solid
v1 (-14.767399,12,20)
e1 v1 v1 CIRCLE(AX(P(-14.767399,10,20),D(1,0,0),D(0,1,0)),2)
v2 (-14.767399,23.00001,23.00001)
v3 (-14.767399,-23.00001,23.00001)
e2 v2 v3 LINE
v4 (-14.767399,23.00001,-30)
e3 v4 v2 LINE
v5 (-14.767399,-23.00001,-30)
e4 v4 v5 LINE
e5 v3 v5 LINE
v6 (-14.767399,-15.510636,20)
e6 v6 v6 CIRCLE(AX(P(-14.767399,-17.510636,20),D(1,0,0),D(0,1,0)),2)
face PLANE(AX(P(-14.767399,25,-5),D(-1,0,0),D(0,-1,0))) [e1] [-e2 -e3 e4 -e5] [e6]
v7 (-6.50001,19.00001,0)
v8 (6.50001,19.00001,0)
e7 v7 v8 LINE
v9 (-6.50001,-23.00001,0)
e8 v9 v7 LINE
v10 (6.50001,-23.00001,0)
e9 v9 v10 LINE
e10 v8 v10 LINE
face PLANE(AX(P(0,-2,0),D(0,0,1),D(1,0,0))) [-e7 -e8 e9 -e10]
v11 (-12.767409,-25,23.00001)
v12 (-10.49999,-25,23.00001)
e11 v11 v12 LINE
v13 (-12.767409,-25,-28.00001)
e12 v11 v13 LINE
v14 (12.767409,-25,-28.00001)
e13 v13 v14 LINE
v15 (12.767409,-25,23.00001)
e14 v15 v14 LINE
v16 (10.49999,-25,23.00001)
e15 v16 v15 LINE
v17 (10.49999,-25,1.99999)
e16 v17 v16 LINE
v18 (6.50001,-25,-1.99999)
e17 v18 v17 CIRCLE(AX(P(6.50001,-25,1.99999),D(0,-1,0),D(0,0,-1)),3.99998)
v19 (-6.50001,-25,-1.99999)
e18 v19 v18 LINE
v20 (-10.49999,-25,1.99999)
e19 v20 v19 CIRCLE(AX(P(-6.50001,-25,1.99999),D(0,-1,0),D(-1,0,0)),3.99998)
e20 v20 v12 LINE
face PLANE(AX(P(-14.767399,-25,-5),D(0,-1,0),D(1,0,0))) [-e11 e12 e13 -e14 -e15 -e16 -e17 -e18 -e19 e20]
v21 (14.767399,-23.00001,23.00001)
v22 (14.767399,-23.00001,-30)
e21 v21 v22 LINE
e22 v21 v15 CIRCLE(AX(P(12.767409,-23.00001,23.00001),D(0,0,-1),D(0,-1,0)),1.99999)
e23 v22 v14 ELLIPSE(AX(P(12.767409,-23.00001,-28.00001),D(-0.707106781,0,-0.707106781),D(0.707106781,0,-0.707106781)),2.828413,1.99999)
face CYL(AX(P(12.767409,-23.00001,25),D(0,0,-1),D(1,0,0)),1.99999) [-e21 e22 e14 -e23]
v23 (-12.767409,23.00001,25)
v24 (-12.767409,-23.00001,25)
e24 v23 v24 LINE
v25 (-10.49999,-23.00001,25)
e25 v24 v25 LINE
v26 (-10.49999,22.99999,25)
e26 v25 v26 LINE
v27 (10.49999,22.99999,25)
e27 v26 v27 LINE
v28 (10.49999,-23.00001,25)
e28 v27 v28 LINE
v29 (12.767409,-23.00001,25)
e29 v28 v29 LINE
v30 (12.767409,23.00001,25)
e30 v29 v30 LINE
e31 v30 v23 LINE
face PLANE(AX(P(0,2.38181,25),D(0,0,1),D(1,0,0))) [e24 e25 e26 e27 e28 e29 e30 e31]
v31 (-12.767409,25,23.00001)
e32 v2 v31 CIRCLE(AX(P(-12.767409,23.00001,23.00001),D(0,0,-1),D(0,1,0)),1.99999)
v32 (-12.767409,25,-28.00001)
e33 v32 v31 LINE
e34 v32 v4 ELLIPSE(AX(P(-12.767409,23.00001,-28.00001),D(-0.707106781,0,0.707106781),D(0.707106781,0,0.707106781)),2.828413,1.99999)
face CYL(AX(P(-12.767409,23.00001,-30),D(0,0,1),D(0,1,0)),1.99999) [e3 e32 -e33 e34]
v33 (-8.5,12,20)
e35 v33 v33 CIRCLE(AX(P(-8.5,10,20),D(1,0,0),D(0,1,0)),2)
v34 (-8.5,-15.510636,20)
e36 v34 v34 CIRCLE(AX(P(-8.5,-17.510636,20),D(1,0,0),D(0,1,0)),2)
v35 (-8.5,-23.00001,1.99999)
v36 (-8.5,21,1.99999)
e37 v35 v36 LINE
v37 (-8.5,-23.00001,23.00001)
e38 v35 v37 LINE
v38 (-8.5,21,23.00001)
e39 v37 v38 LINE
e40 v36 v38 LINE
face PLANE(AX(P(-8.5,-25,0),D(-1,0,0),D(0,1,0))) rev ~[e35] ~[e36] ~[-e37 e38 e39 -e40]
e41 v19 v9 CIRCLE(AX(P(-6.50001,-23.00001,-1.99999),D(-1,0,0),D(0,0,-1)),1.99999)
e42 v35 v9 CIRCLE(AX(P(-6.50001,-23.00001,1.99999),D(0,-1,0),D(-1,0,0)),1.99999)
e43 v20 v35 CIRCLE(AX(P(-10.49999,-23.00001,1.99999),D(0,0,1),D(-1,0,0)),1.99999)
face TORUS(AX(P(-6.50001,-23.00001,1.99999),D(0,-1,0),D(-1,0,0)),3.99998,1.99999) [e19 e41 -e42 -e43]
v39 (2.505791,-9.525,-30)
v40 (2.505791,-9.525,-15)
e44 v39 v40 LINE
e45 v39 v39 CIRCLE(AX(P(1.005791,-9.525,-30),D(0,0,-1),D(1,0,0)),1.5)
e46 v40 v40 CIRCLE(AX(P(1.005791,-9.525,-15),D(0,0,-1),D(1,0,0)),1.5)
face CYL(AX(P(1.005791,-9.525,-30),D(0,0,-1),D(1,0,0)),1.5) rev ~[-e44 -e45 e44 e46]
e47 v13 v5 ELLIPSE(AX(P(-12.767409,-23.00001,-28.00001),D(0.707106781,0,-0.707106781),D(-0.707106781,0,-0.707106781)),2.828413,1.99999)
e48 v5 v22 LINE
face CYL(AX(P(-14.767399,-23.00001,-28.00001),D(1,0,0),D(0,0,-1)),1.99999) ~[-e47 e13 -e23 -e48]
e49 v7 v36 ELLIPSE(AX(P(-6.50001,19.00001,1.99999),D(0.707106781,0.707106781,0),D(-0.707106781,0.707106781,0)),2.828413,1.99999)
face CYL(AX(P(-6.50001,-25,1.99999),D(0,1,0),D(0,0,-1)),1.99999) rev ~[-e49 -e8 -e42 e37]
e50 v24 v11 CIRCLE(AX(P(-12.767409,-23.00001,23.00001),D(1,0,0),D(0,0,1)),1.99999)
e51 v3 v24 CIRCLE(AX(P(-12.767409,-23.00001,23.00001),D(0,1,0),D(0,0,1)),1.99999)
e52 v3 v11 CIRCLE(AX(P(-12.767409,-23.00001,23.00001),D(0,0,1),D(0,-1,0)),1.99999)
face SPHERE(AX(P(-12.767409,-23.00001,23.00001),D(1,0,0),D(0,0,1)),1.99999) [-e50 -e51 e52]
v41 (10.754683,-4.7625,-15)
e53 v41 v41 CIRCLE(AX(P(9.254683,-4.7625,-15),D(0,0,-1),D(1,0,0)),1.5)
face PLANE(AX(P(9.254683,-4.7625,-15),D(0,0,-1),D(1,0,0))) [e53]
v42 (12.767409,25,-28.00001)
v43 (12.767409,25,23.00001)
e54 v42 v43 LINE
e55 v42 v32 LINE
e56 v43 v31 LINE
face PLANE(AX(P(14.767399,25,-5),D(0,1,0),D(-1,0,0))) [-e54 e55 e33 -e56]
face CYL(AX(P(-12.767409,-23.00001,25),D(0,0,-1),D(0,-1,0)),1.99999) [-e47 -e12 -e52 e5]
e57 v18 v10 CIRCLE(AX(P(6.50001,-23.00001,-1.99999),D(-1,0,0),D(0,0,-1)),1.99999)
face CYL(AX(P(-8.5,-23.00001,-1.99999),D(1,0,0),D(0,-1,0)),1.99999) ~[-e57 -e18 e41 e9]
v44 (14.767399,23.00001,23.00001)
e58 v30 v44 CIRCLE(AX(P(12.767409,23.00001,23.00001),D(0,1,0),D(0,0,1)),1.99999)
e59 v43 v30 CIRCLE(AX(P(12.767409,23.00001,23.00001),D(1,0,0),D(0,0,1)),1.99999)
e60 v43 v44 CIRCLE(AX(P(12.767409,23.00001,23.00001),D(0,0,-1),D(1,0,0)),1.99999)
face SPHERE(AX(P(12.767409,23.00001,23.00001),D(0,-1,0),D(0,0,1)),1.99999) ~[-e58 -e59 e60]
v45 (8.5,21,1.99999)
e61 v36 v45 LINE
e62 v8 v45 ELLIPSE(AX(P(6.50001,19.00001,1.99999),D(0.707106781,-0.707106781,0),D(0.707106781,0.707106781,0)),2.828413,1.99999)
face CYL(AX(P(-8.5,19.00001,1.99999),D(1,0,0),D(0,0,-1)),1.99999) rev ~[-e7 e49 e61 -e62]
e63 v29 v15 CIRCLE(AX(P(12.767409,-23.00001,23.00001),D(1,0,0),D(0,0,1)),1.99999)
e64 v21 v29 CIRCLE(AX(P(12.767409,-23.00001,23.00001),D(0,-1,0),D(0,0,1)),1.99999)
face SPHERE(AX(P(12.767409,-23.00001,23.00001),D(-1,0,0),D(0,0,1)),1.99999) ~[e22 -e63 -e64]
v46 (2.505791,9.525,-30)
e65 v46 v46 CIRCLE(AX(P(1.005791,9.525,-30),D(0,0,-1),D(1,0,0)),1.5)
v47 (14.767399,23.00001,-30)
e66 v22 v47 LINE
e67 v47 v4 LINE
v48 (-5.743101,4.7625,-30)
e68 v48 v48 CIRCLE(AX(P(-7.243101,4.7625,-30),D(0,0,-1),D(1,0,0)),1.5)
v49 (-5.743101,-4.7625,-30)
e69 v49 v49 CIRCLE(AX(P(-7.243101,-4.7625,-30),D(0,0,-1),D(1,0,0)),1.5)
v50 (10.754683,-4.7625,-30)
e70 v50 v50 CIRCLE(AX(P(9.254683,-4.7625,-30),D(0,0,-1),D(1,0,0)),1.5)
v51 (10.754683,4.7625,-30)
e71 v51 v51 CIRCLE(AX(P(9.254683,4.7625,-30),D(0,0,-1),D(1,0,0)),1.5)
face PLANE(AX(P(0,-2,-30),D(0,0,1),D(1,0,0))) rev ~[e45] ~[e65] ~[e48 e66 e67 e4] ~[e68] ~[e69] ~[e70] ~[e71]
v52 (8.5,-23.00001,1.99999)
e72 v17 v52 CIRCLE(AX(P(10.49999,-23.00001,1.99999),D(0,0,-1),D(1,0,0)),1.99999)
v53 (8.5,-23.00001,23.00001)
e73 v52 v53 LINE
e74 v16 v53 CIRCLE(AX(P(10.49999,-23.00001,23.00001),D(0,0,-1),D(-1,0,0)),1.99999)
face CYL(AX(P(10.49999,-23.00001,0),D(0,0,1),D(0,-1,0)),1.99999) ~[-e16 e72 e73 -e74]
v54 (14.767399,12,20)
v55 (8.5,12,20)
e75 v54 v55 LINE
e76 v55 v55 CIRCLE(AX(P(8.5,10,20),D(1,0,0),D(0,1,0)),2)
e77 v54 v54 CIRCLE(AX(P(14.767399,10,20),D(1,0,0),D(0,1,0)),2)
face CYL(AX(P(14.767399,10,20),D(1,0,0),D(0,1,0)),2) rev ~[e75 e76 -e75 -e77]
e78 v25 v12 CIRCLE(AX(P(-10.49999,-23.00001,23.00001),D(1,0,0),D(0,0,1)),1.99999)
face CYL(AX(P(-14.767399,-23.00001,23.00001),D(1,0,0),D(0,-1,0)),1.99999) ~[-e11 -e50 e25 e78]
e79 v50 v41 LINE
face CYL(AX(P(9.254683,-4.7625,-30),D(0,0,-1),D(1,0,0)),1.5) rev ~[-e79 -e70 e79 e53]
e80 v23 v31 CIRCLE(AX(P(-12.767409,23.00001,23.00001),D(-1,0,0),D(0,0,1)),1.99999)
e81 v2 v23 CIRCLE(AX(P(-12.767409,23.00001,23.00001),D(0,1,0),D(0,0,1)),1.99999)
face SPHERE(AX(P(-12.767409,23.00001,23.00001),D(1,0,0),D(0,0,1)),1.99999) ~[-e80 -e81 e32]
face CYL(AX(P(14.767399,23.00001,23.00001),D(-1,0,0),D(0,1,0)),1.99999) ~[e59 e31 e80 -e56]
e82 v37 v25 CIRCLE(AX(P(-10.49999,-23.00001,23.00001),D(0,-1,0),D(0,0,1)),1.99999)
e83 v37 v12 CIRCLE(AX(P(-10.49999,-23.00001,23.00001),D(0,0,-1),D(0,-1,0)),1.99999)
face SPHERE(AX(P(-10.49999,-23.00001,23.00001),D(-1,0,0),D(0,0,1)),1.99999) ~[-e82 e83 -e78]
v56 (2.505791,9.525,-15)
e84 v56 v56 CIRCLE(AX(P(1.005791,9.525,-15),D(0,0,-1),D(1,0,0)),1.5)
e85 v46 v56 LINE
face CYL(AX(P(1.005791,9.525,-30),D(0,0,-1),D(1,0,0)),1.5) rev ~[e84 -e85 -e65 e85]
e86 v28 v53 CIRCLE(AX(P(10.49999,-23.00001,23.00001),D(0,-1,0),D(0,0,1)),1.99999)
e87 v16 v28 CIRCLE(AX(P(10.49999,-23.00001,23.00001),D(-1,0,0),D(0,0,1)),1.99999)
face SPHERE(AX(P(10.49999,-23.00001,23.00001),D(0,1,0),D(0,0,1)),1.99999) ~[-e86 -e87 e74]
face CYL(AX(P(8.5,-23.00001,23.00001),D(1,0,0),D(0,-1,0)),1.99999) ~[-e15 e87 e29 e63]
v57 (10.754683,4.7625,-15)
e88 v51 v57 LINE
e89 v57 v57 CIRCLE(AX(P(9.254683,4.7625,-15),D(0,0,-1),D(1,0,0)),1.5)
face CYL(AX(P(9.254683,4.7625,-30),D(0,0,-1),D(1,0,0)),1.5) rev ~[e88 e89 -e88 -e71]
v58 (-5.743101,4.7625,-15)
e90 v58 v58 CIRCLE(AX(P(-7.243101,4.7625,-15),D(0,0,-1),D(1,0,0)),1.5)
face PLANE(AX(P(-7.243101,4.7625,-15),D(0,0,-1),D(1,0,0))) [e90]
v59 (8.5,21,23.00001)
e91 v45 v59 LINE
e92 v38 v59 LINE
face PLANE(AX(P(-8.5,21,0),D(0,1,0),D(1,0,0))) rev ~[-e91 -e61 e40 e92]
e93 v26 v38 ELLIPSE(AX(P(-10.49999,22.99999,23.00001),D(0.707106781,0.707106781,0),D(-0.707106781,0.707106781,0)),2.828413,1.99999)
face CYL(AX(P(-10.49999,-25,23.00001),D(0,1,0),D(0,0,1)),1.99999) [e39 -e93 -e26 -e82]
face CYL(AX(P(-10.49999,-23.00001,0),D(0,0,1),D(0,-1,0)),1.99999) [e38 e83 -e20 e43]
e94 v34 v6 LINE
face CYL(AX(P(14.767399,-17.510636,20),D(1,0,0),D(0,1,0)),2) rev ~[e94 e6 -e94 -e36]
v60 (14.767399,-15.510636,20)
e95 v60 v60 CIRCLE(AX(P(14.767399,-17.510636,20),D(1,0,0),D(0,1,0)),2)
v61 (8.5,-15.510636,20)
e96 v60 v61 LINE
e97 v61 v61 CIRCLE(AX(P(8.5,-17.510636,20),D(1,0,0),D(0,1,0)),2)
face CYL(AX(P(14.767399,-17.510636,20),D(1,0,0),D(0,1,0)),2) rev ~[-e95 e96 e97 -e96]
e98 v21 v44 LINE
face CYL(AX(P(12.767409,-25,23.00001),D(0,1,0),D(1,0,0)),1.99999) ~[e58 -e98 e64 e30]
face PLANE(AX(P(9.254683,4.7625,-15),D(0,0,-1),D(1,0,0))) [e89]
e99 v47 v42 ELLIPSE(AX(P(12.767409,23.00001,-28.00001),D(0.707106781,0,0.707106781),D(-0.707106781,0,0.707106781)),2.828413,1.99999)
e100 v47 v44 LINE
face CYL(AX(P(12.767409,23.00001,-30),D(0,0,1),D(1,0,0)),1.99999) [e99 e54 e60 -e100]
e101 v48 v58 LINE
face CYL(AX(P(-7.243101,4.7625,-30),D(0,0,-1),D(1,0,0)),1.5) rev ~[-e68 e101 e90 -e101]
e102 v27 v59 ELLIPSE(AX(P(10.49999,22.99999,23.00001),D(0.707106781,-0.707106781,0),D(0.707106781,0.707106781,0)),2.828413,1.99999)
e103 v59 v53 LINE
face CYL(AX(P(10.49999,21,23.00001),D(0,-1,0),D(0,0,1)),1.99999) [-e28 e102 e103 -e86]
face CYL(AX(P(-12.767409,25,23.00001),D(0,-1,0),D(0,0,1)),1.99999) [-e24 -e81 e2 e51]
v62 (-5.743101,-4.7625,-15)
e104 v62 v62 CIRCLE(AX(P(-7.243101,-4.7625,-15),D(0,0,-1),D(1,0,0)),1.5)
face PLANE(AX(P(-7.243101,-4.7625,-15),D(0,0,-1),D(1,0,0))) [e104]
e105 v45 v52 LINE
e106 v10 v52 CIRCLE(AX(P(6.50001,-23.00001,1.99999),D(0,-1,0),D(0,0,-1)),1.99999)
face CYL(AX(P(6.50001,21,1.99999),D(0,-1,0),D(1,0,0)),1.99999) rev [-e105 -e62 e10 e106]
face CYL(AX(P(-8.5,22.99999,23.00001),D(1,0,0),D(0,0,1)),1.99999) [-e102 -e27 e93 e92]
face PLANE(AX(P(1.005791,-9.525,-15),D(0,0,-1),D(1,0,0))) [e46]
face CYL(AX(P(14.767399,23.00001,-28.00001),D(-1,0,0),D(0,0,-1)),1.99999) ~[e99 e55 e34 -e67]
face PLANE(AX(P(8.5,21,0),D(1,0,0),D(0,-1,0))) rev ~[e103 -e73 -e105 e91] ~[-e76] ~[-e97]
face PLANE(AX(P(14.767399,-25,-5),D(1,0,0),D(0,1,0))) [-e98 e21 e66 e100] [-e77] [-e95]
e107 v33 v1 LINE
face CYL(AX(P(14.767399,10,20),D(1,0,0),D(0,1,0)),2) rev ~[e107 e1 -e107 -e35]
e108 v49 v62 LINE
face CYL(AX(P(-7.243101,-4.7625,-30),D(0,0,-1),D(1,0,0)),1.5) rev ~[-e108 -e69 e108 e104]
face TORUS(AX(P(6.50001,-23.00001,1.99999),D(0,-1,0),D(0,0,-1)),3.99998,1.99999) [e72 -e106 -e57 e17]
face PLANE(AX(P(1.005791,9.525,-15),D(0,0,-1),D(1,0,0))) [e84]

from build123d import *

# Parameters (mm, degrees)
F1_DEPTH  = 25
F2_DEPTH  = 5
F3_DEPTH  = 25
F4_R      = 2
F5_DEPTH  = 29.5357977842
F6_R      = 2
F7_DEPTH  = 29.5357977842
F8_R      = 1.99999
F9_R      = 1.5
F10_DEPTH = 15


# Not quite as in the source:
# - a fillet or chamfer is up to 0.001 mm smaller than in the source, because OpenCascade refuses the exact size
# - a feature names something its author has since deleted; it is built from what else it names


with BuildPart() as f1:
    # F0 (on Top) → F1 (new body)
    with BuildSketch(Plane.XY):
        Polygon((-8.5, -23.510635891), (-8.5, 0), (-8.5, 21), (8.5, 21), (8.5, 0), (8.5, -23.510635891), (8.5, -25), (14.7673988921, -25), (14.7673988921, -20.1723555878), (14.7673988921, -13.510635891), (14.7673988921, 25), (-14.7673988921, 25), (-14.7673988921, -20.1723555878), (-14.7673988921, -25), (-8.5, -25), align=None)
    extrude(amount=F1_DEPTH)

    # F0 (on Top) → F2 (join)
    with BuildSketch(Plane.XY):
        Polygon((-8.5, 21), (-8.5, 0), (-8.5, -23.510635891), (-8.5, -25), (8.5, -25), (8.5, -23.510635891), (8.5, 0), (8.5, 21), align=None)
        Polygon((-8.5, -23.510635891), (-8.5, 0), (-8.5, 21), (8.5, 21), (8.5, 0), (8.5, -23.510635891), (8.5, -25), (14.7673988921, -25), (14.7673988921, -20.1723555878), (14.7673988921, -13.510635891), (14.7673988921, 25), (-14.7673988921, 25), (-14.7673988921, -20.1723555878), (-14.7673988921, -25), (-8.5, -25), align=None)
    extrude(amount=-F2_DEPTH)

    # F3 (add): a face of the model
    f3_faces = [f1.faces().sort_by_distance(p)[0] for p in [
        (0, 0, -5),
    ]]
    extrude(f3_faces, amount=F3_DEPTH)

    # F4 (on face) → F5 (cut, through all)
    with BuildSketch(Plane.YZ.offset(14.7673988921)):
        with Locations((10, 20)):
            Circle(F4_R)
    extrude(amount=-F5_DEPTH, mode=Mode.SUBTRACT)

    # F6 (on face) → F7 (cut, through all)
    with BuildSketch(Plane.YZ.offset(14.7673988921)):
        with Locations((-17.510635891, 20)):
            Circle(F6_R)
    extrude(amount=-F7_DEPTH, mode=Mode.SUBTRACT)

    # F8 (radius 2 in the source; OpenCascade refuses exactly that, so slightly less here)
    f8_edges = [f1.edges().sort_by_distance(p)[0] for p in [
        (-11.633699, -25, 25),
        (-8.5, -2, 25),
        (0, 21, 25),
        (8.5, -2, 25),
        (11.633699, -25, 25),
        (14.767399, 0, 25),
        (0, 25, 25),
        (-14.767399, 0, 25),
        (-14.767399, 25, -2.5),
        (0, 25, -30),
        (14.767399, 25, -2.5),
        (-14.767399, -25, -2.5),
        (-8.5, -25, 12.5),
        (0, -25, 0),
        (8.5, -25, 12.5),
        (14.767399, -25, -2.5),
        (0, -25, -30),
        (-8.5, -2, 0),
        (0, 21, 0),
        (8.5, -2, 0),
    ]]
    fillet(f8_edges, radius=F8_R)

    # F9 (on face) → F10 (cut)
    with BuildSketch(Plane(origin=(0, 0, -30), x_dir=(1, 0, 0), z_dir=(0, 0, -1))):
        with Locations((9.2546826823, -4.7625)):
            Circle(F9_R)
        with Locations((1.0057907112, -9.525)):
            Circle(F9_R)
        with Locations((-7.2431012598, -4.7625)):
            Circle(F9_R)
        with Locations((-7.2431012598, 4.7625)):
            Circle(F9_R)
        with Locations((1.0057907112, 9.525)):
            Circle(F9_R)
        with Locations((9.2546826823, 4.7625)):
            Circle(F9_R)
    extrude(amount=-F10_DEPTH, mode=Mode.SUBTRACT)


solid = f1.part
